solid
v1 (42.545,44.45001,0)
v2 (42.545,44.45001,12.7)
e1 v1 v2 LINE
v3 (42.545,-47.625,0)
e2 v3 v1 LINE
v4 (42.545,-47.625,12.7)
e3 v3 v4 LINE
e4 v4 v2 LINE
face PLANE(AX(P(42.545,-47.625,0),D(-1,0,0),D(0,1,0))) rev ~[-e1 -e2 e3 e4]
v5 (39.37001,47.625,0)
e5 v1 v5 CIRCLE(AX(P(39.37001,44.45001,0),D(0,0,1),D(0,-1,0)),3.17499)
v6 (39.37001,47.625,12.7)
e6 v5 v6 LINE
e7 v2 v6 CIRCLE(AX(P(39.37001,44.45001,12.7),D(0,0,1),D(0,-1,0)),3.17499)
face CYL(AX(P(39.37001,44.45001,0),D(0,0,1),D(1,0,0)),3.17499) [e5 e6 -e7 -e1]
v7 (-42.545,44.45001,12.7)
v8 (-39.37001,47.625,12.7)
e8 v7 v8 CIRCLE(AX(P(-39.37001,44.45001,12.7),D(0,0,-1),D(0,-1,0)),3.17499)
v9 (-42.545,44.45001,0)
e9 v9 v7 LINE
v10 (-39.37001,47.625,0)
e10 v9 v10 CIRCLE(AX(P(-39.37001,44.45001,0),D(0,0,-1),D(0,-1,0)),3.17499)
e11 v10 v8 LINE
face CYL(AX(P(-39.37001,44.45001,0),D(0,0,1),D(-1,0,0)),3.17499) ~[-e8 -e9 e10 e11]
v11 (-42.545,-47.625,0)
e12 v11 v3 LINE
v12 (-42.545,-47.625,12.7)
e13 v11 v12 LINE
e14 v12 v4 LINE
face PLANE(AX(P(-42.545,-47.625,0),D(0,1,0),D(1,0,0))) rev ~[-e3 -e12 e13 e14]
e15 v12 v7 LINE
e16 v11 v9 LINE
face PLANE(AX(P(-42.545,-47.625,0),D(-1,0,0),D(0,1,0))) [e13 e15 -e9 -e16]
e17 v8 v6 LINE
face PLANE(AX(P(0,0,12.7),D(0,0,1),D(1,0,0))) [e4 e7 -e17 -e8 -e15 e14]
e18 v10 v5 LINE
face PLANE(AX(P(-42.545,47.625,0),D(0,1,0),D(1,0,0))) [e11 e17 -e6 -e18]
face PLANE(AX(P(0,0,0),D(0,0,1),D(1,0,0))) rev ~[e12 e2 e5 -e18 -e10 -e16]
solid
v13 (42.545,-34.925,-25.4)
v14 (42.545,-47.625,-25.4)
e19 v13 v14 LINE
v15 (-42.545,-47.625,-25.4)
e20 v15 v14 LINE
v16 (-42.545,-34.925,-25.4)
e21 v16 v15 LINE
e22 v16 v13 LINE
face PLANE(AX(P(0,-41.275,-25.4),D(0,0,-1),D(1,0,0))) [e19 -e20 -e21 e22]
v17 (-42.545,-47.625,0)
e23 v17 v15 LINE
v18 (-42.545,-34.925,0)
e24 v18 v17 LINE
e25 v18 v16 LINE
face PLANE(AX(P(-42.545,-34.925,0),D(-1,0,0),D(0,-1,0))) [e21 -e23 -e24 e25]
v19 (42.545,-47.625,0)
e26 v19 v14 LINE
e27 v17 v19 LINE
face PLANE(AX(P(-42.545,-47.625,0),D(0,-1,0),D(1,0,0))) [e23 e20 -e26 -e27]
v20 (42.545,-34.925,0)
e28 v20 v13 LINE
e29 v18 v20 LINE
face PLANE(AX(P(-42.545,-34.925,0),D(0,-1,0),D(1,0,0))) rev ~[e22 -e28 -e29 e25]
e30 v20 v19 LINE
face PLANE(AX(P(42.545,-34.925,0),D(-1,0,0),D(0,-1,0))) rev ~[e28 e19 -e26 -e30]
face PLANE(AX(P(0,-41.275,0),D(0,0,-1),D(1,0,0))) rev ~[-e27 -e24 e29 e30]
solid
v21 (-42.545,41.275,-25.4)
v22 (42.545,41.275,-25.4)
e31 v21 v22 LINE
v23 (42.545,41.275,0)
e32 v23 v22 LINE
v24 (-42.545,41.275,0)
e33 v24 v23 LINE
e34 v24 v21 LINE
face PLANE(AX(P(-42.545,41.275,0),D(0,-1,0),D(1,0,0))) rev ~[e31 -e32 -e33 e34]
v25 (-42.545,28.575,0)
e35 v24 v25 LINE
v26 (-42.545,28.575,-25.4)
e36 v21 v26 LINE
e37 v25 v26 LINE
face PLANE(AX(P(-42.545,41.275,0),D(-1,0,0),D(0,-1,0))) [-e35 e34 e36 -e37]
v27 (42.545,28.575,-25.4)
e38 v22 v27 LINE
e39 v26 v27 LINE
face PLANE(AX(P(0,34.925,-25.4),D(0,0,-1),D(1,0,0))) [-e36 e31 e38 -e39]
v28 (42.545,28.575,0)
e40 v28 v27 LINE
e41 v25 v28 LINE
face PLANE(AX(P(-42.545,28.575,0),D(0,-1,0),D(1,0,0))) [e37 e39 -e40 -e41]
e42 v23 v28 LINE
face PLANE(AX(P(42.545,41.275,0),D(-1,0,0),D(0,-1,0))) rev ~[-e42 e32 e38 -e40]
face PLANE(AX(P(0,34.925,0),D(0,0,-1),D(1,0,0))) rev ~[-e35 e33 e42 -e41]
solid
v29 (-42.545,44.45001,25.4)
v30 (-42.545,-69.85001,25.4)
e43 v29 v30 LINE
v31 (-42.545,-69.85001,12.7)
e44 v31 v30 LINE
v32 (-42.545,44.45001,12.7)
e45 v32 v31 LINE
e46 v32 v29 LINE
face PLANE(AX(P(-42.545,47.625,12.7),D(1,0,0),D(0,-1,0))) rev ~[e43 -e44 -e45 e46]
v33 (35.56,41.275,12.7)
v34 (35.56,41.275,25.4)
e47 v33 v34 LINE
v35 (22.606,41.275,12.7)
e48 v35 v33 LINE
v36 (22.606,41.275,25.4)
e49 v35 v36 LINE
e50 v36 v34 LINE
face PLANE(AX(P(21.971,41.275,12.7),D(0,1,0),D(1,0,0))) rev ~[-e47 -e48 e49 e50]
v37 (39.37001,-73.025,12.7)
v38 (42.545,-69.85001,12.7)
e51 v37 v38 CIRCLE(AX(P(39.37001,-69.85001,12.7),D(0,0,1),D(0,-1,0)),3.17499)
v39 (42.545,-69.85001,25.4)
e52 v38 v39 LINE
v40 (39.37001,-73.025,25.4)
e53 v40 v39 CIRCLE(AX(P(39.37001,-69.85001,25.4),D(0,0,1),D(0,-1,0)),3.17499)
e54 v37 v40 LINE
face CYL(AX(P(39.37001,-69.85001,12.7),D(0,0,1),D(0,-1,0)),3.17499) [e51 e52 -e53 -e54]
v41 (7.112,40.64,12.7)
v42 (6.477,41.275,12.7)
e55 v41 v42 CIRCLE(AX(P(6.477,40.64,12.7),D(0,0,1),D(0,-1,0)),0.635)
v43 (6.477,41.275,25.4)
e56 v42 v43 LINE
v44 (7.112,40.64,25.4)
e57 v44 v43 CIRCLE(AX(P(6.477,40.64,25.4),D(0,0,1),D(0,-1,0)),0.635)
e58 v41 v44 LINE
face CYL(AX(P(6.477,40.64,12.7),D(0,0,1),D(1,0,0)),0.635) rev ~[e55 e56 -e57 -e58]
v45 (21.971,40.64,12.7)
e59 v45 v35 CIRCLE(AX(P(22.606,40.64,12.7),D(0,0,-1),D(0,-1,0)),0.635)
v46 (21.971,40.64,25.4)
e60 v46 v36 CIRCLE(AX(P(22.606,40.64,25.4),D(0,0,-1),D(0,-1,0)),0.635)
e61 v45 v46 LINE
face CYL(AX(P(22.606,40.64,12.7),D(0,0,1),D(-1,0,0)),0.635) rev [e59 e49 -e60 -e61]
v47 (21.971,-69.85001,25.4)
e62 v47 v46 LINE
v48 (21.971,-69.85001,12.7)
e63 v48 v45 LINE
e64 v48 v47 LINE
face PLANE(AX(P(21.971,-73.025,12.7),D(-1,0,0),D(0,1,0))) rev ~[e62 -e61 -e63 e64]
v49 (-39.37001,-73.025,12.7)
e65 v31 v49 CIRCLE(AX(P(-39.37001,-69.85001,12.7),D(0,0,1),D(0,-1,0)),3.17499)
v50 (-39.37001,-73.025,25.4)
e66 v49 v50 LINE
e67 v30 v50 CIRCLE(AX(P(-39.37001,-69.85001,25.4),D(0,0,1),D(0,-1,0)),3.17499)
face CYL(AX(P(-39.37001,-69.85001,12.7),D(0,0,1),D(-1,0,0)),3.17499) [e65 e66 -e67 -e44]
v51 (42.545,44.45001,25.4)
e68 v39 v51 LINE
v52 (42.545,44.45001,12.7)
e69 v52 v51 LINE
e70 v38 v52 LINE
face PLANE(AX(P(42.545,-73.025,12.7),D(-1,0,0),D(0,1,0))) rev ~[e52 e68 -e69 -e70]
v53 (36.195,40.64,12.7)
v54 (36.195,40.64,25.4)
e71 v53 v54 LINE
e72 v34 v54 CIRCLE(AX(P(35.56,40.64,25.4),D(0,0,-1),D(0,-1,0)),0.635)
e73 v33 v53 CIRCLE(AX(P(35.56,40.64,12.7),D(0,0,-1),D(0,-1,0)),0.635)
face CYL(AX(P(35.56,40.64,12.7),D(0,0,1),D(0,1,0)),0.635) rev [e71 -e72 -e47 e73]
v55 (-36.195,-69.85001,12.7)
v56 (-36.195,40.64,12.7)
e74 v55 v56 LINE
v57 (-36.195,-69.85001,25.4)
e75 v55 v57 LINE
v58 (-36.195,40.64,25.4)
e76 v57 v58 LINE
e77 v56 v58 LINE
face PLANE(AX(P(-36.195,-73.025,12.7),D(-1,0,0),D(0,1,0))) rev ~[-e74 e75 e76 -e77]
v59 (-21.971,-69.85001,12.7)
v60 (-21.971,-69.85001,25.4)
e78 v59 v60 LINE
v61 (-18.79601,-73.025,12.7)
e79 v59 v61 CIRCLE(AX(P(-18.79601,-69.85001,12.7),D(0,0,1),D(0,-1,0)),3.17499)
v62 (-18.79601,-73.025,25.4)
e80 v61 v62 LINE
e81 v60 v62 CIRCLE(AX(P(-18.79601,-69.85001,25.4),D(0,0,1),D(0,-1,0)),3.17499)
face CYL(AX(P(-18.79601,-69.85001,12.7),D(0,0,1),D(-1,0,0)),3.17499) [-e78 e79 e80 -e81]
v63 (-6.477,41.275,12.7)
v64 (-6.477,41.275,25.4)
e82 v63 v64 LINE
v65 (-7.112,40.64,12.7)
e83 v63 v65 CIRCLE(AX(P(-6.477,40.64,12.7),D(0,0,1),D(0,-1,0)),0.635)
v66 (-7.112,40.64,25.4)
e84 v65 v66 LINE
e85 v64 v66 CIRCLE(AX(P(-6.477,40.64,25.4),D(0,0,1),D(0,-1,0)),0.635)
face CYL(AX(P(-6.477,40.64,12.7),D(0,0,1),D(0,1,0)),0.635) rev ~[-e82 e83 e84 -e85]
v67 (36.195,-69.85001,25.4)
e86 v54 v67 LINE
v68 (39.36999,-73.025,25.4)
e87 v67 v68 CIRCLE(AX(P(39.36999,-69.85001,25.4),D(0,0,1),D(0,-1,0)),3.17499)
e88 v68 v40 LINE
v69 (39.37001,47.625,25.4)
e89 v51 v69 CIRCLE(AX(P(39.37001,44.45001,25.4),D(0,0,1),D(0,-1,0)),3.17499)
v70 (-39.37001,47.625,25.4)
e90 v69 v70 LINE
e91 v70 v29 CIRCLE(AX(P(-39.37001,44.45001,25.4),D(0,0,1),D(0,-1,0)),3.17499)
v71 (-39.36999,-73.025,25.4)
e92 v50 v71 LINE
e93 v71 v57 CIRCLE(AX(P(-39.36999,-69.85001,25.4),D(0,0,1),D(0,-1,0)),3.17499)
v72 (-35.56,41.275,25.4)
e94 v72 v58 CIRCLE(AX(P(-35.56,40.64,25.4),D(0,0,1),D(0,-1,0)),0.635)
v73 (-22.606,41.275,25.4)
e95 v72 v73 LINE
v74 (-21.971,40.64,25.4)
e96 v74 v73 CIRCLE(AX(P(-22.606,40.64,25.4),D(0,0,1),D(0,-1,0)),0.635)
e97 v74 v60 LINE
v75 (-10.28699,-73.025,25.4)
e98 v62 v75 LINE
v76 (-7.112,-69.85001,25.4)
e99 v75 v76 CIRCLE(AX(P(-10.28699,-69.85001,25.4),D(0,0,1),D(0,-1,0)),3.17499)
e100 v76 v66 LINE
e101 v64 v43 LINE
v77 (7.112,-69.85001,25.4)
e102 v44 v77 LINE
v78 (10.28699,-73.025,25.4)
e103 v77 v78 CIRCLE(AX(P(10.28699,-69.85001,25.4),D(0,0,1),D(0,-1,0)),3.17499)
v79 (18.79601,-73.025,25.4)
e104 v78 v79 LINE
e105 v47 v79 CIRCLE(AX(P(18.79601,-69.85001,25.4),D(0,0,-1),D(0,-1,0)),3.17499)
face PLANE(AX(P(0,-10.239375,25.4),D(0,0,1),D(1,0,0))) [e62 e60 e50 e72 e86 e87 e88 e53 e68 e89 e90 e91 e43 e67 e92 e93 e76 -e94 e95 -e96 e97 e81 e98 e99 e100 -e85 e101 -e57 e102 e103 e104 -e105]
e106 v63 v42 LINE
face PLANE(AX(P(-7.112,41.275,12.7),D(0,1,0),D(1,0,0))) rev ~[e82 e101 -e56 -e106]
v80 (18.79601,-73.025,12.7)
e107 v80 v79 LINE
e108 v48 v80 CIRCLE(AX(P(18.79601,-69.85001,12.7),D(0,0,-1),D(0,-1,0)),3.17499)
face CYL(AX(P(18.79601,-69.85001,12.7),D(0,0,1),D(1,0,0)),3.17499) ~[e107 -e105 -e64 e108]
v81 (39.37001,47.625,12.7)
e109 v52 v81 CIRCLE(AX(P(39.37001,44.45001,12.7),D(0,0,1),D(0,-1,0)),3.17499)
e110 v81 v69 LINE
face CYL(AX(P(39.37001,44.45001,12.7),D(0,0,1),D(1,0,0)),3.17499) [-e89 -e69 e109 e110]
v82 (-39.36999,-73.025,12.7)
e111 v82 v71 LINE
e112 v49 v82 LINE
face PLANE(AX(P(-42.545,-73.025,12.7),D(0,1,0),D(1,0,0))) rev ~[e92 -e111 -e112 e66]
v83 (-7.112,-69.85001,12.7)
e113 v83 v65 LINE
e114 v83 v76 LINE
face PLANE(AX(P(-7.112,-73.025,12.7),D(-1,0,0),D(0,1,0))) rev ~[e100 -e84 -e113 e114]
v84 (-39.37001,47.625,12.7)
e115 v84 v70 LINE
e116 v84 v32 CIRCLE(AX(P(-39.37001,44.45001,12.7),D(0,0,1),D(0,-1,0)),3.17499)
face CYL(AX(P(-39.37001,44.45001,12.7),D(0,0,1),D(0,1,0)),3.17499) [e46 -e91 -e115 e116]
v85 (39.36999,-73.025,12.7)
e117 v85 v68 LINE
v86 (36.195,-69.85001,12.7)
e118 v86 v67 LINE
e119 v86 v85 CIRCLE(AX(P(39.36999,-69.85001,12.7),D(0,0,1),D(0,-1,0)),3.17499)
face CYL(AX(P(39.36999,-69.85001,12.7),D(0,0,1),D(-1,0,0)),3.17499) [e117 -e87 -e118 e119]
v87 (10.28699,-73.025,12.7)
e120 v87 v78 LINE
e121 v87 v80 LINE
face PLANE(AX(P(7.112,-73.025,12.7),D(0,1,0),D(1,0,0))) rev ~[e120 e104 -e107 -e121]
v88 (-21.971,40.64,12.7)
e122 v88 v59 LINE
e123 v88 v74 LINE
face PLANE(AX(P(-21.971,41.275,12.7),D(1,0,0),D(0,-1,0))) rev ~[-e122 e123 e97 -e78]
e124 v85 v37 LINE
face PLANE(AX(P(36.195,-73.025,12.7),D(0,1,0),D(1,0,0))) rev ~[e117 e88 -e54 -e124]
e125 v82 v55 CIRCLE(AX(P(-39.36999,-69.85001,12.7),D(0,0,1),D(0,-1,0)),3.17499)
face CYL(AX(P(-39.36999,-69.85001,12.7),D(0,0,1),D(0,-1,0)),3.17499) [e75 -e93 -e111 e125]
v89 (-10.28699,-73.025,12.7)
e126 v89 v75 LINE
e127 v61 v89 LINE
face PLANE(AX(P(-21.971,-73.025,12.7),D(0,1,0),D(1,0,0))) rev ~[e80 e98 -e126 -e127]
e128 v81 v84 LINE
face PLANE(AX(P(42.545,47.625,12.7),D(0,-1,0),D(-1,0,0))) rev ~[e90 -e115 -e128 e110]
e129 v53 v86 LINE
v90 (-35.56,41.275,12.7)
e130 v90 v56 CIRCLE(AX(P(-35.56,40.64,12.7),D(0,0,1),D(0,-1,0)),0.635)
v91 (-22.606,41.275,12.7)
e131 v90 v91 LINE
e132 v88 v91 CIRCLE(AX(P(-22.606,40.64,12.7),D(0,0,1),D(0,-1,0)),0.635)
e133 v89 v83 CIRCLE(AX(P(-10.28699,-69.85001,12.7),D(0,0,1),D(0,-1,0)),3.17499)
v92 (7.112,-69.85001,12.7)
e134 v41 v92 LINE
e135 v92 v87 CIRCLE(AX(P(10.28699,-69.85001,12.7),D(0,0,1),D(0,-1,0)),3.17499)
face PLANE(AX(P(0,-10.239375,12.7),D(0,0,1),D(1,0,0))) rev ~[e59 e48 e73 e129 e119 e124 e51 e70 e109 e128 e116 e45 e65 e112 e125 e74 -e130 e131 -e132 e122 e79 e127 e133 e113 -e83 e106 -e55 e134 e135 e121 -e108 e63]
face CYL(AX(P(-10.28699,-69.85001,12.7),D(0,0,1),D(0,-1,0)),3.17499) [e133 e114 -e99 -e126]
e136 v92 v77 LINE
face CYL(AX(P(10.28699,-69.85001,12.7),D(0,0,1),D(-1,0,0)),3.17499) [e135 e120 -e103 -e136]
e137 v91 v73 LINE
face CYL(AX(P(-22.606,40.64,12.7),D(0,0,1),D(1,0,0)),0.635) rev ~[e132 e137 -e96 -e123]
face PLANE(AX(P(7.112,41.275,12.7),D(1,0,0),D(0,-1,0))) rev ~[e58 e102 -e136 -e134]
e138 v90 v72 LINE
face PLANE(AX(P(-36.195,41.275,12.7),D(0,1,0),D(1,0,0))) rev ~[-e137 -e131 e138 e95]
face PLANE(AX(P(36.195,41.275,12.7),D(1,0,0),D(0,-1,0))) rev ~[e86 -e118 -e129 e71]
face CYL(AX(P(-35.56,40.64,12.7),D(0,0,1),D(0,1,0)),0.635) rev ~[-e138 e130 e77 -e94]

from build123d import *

# Parameters (mm, degrees)
F0_W     = 85.09
F0_H     = 95.25
F1_DEPTH = 12.7
F3_DEPTH = 12.7
F4_W     = 85.09
F4_H     = 12.7
F5_DEPTH = 25.4
F6_R     = 3.17499
F6_2_R   = 3.17499
F7_R     = 0.635


# Not quite as in the source:
# - a fillet or chamfer is up to 0.001 mm smaller than in the source, because OpenCascade refuses the exact size


with BuildPart() as f1:
    # F0 (on Top) → F1 (new body)
    with BuildSketch(Plane.XY):
        Rectangle(F0_W, F0_H)
    extrude(amount=F1_DEPTH)

    # F6#2 (radius 3.175 in the source; OpenCascade refuses exactly that, so slightly less here)
    f6_2_edges = [f1.edges().sort_by_distance(p)[0] for p in [
        (42.545, 47.625, 6.35),
        (-42.545, 47.625, 6.35),
    ]]
    fillet(f6_2_edges, radius=F6_2_R)


with BuildPart() as f3:
    # F2 (on face) → F3 (new body)
    with BuildSketch(Plane.XY.offset(12.7)):
        Polygon((21.971, -73.025), (21.971, 41.275), (36.195, 41.275), (36.195, -73.025), (42.545, -73.025), (42.545, 47.625), (-42.545, 47.625), (-42.545, -73.025), (-36.195, -73.025), (-36.195, 41.275), (-21.971, 41.275), (-21.971, -73.025), (-7.112, -73.025), (-7.112, 41.275), (7.112, 41.275), (7.112, -73.025), align=None)
    extrude(amount=F3_DEPTH)

    # F6 (radius 3.175 in the source; OpenCascade refuses exactly that, so slightly less here)
    f6_edges = [f3.edges().sort_by_distance(p)[0] for p in [
        (-36.195, -73.025, 19.05),
        (-42.545, -73.025, 19.05),
        (-21.971, -73.025, 19.05),
        (-7.112, -73.025, 19.05),
        (7.112, -73.025, 19.05),
        (21.971, -73.025, 19.05),
        (42.545, -73.025, 19.05),
        (42.545, 47.625, 19.05),
        (-42.545, 47.625, 19.05),
        (36.195, -73.025, 19.05),
    ]]
    fillet(f6_edges, radius=F6_R)

    # F7
    f7_edges = [f3.edges().sort_by_distance(p)[0] for p in [
        (-36.195, 41.275, 19.05),
        (-7.112, 41.275, 19.05),
        (21.971, 41.275, 19.05),
        (-21.971, 41.275, 19.05),
        (7.112, 41.275, 19.05),
        (36.195, 41.275, 19.05),
    ]]
    fillet(f7_edges, radius=F7_R)


with BuildPart() as f5:
    # F4 (on face) → F5 (new body)
    with BuildSketch(Plane(origin=(0, 0, 0), x_dir=(1, 0, 0), z_dir=(0, 0, -1))):
        with Locations((0, 41.275)):
            Rectangle(F4_W, F4_H)
    extrude(amount=F5_DEPTH)


with BuildPart() as f5b:
    # F4 (on face) → F5, piece 2 (new body)
    with BuildSketch(Plane(origin=(0, 0, 0), x_dir=(1, 0, 0), z_dir=(0, 0, -1))):
        with Locations((0, -34.925)):
            Rectangle(F4_W, F4_H)
    extrude(amount=F5_DEPTH)


solid = Compound([f1.part, f3.part, f5.part, f5b.part])
